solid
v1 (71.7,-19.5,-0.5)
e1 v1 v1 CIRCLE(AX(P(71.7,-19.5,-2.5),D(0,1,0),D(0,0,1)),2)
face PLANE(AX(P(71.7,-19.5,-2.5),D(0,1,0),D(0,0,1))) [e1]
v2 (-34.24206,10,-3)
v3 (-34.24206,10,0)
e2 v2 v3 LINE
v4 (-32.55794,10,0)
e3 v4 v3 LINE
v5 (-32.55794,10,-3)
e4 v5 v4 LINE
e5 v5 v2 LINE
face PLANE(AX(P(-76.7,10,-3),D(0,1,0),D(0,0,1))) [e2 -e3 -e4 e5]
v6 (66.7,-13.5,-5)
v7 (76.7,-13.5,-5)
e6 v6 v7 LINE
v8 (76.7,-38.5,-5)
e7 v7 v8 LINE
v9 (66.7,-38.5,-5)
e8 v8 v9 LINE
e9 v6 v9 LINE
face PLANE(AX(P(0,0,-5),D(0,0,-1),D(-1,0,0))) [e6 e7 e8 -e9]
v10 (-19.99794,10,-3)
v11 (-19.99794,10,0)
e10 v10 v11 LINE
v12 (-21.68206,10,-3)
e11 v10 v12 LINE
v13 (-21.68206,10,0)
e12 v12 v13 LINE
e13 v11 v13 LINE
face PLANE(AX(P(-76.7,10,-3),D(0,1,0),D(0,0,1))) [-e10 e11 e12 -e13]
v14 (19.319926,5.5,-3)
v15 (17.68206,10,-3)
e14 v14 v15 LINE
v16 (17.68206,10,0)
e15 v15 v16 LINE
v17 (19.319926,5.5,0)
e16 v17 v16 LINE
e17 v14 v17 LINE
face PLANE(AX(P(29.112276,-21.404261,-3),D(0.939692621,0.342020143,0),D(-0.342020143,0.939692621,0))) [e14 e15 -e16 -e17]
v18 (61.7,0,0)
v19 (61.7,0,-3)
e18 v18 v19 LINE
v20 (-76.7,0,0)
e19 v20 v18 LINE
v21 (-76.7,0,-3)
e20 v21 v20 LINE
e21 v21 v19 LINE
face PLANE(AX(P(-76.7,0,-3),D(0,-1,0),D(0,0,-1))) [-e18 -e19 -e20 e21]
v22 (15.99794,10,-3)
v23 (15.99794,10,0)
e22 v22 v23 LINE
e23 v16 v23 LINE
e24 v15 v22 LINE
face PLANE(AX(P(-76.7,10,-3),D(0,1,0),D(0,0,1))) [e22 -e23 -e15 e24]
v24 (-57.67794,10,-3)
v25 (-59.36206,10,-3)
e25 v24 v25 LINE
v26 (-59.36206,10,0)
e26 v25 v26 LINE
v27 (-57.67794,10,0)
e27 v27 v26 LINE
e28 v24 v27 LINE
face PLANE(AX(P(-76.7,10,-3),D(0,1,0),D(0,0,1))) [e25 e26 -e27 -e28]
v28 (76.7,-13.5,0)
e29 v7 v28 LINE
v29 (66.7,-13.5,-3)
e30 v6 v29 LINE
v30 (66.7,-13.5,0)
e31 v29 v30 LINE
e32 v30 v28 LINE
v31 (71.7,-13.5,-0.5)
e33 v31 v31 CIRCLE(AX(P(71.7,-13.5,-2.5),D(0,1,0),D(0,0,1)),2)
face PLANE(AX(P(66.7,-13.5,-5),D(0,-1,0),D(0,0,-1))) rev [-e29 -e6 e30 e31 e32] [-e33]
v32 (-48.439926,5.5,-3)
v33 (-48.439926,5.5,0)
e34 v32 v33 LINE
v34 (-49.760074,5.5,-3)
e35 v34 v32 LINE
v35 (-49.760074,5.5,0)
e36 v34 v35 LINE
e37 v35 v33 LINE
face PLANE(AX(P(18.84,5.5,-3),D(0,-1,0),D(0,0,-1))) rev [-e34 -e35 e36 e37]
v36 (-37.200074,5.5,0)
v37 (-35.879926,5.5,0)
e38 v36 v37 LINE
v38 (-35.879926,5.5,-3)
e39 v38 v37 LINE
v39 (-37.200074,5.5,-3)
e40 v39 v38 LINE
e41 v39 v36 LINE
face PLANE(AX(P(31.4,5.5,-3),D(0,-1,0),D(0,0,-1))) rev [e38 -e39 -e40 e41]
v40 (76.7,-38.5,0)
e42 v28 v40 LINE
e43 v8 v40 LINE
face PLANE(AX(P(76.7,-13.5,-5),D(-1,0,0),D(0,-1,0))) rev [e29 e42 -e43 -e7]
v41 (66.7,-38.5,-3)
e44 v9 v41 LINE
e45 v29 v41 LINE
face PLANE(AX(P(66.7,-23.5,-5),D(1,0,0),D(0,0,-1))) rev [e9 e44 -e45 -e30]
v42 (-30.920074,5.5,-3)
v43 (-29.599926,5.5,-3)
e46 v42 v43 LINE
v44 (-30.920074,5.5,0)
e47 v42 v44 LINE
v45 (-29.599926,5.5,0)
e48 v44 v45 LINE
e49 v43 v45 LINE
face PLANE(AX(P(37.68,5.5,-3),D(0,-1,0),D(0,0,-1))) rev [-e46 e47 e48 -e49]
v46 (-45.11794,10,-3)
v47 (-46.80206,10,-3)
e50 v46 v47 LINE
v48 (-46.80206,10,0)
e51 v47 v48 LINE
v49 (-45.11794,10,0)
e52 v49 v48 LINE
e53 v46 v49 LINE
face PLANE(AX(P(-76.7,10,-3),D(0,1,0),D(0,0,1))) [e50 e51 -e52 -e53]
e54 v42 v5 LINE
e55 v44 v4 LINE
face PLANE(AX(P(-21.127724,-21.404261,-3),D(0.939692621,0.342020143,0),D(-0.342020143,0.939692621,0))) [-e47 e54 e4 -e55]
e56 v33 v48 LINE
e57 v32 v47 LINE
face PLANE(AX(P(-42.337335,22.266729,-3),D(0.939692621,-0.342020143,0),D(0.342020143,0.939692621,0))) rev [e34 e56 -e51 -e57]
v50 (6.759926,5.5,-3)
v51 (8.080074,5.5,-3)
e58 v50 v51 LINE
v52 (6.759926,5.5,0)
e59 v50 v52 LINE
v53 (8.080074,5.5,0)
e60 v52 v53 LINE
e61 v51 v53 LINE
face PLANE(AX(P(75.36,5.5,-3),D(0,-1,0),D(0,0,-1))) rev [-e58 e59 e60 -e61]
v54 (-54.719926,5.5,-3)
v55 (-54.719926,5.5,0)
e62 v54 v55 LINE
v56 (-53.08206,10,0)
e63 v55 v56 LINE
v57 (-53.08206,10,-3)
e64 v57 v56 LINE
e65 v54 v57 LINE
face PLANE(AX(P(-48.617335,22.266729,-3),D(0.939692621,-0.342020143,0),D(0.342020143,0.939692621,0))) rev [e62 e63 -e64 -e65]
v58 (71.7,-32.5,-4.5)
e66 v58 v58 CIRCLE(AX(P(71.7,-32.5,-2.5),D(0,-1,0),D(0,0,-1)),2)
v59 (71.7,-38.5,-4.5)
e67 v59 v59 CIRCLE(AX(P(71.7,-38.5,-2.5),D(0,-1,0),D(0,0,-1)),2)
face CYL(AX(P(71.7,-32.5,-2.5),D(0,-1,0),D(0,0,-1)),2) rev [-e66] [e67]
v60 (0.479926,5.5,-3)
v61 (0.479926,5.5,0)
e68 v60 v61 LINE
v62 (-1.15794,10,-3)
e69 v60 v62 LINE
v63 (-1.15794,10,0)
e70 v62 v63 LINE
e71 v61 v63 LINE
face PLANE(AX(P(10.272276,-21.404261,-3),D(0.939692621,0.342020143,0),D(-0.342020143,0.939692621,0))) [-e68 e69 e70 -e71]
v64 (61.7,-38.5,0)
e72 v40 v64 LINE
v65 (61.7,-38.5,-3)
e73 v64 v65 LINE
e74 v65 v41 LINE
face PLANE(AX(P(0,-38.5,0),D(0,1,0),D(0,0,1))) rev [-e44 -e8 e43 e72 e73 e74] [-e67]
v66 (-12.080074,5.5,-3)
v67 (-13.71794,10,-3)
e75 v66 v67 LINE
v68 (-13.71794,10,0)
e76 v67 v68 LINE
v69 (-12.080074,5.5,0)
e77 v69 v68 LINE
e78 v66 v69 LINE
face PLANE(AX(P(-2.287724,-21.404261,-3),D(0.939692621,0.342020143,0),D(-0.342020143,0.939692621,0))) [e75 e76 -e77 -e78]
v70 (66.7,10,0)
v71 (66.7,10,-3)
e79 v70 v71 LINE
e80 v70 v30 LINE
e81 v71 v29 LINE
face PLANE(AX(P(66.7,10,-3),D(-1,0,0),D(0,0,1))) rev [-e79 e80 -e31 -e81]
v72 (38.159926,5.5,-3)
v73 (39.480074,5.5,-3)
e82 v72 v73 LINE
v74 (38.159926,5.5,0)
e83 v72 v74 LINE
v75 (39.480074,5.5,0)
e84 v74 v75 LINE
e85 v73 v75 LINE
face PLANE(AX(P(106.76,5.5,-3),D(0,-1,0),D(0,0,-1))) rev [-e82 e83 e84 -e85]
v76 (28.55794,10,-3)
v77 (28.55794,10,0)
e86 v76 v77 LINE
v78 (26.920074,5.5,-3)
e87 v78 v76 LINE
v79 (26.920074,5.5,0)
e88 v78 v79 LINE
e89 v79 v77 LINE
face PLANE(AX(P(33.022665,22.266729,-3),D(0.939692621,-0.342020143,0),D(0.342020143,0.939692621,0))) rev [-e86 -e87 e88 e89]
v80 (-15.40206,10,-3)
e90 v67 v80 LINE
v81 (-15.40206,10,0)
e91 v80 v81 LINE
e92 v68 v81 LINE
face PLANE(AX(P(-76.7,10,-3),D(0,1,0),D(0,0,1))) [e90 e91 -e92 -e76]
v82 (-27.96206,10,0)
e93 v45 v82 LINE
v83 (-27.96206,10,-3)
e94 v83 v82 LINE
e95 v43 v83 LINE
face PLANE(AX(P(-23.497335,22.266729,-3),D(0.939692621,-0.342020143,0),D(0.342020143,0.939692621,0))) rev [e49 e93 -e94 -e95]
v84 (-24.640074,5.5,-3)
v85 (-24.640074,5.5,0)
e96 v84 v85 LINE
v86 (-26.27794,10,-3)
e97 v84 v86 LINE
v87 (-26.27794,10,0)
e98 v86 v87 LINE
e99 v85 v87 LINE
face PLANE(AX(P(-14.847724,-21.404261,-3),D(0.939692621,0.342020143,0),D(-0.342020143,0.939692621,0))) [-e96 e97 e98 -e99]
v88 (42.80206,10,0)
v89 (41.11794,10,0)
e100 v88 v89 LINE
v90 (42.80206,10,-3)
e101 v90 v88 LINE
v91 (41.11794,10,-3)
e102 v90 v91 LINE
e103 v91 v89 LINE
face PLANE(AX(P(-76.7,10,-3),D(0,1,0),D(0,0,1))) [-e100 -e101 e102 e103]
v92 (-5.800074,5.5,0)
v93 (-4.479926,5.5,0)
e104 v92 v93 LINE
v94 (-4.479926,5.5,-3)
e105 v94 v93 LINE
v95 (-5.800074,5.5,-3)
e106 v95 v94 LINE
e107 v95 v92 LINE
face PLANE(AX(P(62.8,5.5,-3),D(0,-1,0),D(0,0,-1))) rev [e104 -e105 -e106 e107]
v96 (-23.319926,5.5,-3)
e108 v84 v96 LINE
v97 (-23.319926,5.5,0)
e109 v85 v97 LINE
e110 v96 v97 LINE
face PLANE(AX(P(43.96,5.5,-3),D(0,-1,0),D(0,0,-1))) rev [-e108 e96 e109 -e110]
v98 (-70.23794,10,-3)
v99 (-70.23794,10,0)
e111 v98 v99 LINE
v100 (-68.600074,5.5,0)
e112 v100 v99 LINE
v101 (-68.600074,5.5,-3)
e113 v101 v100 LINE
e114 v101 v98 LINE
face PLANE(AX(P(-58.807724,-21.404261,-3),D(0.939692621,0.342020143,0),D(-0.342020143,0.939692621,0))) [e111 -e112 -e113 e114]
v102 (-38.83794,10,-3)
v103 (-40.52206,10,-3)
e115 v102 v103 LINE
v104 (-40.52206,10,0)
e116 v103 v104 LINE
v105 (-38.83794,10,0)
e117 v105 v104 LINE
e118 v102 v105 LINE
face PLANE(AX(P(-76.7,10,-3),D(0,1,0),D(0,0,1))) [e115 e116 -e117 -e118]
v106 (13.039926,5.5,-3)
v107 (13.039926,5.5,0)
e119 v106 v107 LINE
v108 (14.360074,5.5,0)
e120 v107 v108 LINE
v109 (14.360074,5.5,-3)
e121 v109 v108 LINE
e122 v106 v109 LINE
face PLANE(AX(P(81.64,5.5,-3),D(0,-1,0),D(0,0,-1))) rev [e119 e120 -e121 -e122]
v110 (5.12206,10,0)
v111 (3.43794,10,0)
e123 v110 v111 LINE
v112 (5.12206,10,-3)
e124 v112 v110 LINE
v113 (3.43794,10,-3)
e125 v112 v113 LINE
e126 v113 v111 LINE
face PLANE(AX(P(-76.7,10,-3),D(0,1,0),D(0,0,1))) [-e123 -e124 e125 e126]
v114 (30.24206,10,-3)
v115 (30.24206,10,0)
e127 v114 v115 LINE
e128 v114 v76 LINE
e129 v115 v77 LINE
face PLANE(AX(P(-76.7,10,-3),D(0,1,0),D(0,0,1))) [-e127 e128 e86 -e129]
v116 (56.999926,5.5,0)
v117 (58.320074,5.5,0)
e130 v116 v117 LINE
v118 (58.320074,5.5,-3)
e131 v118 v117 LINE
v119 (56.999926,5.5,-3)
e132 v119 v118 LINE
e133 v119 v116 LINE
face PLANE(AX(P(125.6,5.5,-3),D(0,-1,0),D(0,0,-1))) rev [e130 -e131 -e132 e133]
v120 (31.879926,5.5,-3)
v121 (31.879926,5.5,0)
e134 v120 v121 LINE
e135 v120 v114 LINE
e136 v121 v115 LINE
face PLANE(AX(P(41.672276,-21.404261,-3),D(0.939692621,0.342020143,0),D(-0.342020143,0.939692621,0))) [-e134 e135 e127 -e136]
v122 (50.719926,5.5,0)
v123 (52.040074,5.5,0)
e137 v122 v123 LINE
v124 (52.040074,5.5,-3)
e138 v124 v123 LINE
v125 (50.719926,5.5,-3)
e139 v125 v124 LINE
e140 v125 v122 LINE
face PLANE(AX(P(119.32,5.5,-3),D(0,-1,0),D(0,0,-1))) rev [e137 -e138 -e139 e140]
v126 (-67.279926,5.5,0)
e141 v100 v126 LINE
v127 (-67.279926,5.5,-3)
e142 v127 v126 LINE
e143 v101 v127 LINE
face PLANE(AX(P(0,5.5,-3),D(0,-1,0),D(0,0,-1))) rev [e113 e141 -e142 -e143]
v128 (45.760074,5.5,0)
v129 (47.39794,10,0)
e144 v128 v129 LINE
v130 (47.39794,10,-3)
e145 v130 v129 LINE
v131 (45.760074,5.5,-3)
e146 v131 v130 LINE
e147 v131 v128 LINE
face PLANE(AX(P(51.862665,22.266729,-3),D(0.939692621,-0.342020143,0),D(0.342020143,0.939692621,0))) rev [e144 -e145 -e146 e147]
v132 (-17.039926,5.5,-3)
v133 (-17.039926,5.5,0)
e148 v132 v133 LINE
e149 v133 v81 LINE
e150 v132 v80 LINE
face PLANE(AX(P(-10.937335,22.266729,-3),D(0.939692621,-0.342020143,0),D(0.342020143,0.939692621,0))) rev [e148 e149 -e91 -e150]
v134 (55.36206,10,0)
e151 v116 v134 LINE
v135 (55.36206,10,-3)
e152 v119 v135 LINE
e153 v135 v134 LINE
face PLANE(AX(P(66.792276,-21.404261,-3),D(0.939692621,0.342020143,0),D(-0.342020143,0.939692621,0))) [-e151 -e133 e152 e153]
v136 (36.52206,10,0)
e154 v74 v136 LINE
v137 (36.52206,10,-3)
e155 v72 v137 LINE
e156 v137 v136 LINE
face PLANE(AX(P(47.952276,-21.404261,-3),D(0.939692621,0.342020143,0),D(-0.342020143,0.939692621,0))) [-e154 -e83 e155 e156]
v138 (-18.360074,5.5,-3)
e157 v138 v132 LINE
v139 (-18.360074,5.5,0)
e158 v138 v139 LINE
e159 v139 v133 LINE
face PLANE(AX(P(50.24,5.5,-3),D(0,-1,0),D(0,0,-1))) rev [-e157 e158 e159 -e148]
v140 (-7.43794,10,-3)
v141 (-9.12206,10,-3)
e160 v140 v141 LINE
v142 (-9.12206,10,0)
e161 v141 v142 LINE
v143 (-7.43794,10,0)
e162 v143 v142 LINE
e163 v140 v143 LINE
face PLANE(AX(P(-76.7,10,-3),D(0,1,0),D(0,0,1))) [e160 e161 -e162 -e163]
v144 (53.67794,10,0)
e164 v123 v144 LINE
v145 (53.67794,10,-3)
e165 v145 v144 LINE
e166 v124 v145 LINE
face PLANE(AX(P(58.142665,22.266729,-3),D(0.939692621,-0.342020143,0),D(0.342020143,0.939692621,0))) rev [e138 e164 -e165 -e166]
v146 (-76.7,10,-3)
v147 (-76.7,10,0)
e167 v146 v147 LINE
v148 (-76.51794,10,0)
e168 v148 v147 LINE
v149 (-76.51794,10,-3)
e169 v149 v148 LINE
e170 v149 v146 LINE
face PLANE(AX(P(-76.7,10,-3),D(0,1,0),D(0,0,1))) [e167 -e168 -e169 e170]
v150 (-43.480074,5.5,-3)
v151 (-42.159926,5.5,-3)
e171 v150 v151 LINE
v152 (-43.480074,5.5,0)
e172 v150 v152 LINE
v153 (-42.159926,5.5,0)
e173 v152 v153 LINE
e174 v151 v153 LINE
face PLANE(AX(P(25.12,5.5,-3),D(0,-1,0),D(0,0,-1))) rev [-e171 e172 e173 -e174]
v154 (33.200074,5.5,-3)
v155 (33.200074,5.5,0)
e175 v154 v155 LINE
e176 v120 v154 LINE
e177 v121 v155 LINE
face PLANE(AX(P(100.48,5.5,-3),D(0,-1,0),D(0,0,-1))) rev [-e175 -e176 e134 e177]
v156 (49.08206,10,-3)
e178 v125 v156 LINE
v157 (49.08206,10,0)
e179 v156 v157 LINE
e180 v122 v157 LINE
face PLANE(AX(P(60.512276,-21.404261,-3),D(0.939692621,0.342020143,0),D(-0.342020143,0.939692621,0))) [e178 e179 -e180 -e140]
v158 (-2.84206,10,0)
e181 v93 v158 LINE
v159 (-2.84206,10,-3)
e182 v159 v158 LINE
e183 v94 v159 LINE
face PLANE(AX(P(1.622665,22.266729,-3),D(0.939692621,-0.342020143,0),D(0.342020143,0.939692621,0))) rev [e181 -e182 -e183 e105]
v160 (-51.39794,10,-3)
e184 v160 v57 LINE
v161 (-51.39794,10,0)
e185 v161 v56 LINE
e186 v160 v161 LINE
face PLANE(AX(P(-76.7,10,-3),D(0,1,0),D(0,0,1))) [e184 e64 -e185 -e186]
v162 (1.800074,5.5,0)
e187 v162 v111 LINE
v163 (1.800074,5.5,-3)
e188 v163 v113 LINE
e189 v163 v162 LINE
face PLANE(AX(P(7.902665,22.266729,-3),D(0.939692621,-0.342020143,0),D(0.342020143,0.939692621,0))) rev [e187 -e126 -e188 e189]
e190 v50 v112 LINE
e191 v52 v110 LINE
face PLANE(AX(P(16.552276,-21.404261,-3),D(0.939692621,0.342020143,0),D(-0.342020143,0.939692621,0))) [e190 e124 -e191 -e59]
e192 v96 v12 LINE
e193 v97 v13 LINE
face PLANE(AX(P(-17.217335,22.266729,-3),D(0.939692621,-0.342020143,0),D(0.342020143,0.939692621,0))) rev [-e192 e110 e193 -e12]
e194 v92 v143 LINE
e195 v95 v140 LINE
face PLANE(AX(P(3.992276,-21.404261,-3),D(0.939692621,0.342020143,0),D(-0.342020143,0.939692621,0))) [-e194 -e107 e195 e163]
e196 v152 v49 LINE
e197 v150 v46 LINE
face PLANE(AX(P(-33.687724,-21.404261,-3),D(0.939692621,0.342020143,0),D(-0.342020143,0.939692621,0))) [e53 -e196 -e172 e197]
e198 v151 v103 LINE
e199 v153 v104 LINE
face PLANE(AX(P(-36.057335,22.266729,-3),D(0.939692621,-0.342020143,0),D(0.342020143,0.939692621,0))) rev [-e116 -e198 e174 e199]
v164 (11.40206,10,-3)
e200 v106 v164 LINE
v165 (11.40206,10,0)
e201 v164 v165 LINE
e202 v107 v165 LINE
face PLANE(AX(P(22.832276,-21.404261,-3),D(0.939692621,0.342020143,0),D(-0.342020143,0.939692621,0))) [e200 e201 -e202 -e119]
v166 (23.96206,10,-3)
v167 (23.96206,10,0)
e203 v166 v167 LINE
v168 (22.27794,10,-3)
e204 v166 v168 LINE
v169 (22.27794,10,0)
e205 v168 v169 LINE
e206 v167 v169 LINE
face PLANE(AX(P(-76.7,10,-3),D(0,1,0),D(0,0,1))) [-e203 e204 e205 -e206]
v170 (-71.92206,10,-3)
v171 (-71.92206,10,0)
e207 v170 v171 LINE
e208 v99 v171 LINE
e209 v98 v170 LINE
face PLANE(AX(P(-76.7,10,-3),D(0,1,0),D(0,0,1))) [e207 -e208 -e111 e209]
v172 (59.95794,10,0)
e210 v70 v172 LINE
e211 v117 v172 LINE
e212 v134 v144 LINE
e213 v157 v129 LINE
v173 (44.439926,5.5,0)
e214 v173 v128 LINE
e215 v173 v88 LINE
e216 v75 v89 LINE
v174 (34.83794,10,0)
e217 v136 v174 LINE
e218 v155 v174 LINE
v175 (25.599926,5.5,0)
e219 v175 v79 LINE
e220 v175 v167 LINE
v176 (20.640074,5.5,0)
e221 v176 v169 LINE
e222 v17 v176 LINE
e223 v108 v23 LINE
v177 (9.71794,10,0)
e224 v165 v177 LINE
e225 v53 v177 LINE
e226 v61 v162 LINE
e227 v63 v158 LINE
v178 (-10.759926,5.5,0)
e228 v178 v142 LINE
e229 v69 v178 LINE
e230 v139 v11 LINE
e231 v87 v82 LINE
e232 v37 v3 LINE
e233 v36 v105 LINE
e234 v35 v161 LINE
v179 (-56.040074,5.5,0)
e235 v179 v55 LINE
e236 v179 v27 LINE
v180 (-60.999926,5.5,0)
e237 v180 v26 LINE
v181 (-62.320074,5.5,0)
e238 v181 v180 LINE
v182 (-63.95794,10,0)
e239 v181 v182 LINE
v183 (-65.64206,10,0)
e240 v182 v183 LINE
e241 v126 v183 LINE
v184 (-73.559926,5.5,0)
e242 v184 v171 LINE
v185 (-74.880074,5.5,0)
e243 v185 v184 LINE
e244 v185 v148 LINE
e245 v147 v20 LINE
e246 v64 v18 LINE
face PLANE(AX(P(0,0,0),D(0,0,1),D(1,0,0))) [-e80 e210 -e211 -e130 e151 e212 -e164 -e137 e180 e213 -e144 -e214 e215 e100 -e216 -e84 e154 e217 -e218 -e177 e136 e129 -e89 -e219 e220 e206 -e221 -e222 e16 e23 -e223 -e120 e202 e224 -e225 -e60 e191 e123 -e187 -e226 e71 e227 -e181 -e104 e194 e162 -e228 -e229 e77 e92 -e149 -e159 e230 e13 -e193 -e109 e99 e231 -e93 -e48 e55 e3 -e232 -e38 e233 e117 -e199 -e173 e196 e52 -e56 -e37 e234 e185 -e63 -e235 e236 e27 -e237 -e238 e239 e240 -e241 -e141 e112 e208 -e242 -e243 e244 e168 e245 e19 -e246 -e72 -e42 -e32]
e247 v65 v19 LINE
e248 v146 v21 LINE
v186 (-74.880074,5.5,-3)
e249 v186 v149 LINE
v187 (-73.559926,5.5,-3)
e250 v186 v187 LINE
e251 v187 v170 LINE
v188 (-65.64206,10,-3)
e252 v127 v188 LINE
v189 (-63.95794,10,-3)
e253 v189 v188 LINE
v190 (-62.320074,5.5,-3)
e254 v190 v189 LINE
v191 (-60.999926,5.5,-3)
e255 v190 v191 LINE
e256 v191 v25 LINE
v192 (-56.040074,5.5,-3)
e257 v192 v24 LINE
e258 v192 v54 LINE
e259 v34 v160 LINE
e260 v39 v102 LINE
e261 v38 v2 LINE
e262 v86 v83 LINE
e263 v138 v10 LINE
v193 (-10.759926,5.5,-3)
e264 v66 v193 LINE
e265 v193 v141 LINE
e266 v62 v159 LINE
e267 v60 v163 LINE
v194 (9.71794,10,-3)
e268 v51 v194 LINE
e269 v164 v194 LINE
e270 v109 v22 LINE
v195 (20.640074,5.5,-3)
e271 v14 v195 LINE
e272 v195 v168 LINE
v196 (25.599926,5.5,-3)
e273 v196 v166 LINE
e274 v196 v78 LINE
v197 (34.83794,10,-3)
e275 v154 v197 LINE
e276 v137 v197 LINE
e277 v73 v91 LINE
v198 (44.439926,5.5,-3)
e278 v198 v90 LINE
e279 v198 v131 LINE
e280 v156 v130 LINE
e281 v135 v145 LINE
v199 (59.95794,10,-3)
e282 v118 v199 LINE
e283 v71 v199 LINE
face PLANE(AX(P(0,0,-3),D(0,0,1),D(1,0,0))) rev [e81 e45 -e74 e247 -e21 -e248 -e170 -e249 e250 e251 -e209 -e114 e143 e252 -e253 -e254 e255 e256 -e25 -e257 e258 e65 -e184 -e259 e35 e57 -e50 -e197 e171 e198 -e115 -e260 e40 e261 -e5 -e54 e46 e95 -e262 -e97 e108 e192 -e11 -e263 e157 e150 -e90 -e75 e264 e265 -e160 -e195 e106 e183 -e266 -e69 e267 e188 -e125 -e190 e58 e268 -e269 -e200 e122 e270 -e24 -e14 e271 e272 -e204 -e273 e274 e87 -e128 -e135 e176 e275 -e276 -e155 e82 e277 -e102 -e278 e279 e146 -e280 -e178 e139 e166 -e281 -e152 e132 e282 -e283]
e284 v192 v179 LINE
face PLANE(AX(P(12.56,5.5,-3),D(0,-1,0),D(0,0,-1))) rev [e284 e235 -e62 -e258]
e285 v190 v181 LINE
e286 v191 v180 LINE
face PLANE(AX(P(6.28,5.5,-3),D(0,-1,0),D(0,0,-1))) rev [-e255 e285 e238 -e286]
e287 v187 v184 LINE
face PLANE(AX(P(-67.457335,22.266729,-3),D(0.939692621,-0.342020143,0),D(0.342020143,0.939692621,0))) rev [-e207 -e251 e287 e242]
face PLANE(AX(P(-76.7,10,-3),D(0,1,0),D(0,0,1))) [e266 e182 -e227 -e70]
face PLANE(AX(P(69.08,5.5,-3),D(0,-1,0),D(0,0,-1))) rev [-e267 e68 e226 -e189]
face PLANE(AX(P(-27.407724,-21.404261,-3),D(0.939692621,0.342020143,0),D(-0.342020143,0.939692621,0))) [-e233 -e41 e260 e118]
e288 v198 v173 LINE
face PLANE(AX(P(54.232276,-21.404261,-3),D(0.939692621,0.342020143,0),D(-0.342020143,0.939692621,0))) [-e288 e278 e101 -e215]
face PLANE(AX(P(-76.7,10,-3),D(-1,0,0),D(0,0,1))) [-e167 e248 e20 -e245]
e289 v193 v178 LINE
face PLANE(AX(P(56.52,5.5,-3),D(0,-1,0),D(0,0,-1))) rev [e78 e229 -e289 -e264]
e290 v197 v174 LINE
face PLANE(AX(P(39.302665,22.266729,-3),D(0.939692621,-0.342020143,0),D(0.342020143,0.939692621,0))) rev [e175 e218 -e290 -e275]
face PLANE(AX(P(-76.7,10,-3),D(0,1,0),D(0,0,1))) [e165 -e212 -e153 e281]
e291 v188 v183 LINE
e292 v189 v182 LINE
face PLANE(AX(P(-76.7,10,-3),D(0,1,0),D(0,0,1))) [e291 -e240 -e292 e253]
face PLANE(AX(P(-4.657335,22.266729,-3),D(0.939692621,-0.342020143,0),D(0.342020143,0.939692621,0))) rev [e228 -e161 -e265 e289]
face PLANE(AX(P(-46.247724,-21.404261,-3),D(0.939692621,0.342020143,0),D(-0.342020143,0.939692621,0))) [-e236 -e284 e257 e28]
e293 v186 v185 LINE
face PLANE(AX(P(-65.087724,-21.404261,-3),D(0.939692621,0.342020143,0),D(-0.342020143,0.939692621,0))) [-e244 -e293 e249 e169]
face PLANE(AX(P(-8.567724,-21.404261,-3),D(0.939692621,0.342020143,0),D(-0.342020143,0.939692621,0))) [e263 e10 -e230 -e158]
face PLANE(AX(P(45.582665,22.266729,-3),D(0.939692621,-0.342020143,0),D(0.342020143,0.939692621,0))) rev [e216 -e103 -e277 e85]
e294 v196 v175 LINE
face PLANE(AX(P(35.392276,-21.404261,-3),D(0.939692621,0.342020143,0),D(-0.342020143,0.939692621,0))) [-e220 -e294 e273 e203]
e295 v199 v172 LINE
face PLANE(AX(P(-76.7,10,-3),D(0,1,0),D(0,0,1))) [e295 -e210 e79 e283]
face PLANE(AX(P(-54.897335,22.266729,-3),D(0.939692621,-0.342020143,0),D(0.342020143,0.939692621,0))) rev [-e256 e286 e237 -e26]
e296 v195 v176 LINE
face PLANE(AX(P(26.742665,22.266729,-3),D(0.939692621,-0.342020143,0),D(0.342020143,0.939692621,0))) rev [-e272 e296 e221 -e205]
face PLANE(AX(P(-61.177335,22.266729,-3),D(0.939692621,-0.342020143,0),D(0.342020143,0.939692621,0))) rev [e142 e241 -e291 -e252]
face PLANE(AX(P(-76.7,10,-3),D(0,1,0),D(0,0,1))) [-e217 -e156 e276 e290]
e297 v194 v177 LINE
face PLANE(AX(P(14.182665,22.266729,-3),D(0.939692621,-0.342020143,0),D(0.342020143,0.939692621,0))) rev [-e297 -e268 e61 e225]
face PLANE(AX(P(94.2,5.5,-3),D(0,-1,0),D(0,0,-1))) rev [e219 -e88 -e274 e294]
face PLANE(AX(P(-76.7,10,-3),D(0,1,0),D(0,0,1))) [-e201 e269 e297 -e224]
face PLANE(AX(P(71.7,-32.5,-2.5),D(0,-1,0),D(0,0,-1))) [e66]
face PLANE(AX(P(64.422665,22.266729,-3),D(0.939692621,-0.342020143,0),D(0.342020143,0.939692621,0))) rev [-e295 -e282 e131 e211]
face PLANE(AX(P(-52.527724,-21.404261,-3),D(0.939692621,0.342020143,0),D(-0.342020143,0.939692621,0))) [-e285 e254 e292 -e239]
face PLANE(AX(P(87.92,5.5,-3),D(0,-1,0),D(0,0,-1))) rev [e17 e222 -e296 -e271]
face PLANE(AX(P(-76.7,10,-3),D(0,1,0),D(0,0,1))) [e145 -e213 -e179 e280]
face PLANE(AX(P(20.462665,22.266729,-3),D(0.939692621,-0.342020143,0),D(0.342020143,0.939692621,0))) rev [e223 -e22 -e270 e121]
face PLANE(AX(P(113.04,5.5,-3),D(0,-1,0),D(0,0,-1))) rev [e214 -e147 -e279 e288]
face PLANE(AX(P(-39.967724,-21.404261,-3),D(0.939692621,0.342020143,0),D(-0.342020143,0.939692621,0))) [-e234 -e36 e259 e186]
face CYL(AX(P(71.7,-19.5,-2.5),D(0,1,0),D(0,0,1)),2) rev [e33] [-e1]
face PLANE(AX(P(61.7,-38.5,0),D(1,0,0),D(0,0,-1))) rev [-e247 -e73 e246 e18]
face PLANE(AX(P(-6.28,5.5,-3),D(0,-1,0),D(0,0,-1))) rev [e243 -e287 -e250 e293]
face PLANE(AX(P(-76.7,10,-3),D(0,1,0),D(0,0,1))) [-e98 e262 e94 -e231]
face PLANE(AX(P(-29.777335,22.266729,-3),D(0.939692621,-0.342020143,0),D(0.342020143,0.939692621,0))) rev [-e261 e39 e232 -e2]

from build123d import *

# Parameters (mm, degrees)
SKETCH_1_W                 = 153.4
SKETCH_1_H                 = 10
EXTRUDE_1_DEPTH            = 3
CUT_EXTRUDE_1_DEPTH        = 78.407299397
PATTERN_LINEAR_1_COUNT     = 21
PATTERN_LINEAR_1_PITCH     = 6.28
PATTERN_LINEAR_1_COL_COUNT = 2
PATTERN_LINEAR_1_COL_PITCH = 6.28
SKETCH_3_W                 = 10
SKETCH_3_H                 = 3
CUT_EXTRUDE_2_DEPTH        = 78.407299397
SKETCH_4_W                 = 5
SKETCH_4_H                 = 3
EXTRUDE_2_DEPTH            = 38.5
EXTRUDE_START              = -5
EXTRUDE_1_2_OUTLINE_W      = 10
EXTRUDE_1_2_OUTLINE_H      = 25
EXTRUDE_1_2_DEPTH          = 5
SKETCH_6_R                 = 2
CUT_EXTRUDE_3_DEPTH        = 6
CUT_EXTRUDE_START          = -6
SKETCH_7_R                 = 2
CUT_EXTRUDE_4_DEPTH        = 6


# Read off the part's stored shape, not the designer's step: 돌출-얇게1
with BuildPart() as part:
    # 스케치1 → Extrude 1 (new body)
    with BuildSketch(Plane.XY):
        with Locations((0, 5)):
            Rectangle(SKETCH_1_W, SKETCH_1_H)
    extrude(amount=-EXTRUDE_1_DEPTH)

    # 스케치2 → 컷-돌출1 (cut, through all)
    with BuildSketch(Plane.XY):
        Polygon((-67.94, 8), (-67.94, 10), (-70.237940469, 10), (-69.51, 8), align=None)
        Polygon((-65.642059531, 10), (-67.94, 10), (-67.94, 8), (-66.37, 8), align=None)
        Polygon((-66.37, 8), (-67.94, 8), (-67.94, 5.5), (-67.279925586, 5.5), align=None)
        Polygon((-67.94, 5.5), (-67.94, 8), (-69.51, 8), (-68.600074414, 5.5), align=None)
    cut_extrude_1 = extrude(amount=-CUT_EXTRUDE_1_DEPTH, mode=Mode.SUBTRACT)

    # 선형 패턴1: 컷-돌출1 ×21
    with Locations(*[(i * PATTERN_LINEAR_1_PITCH, 0, 0) for i in range(1, PATTERN_LINEAR_1_COUNT)]):
        add(cut_extrude_1, mode=Mode.SUBTRACT)

    # 선형 패턴1 col: 컷-돌출1 ×2
    with Locations(*[(-i * PATTERN_LINEAR_1_COL_PITCH, 0, 0) for i in range(1, PATTERN_LINEAR_1_COL_COUNT)]):
        add(cut_extrude_1, mode=Mode.SUBTRACT)

    # 스케치3 → 컷-돌출2 (cut, through all)
    with BuildSketch(Plane.XZ):
        with Locations((71.7, -1.5)):
            Rectangle(SKETCH_3_W, SKETCH_3_H)
    extrude(amount=-CUT_EXTRUDE_2_DEPTH, mode=Mode.SUBTRACT)

    # 스케치4 → 보스-돌출2 (add)
    with BuildSketch(Plane(origin=(0, 0, 0), x_dir=(-1, 0, 0), z_dir=(0, -1, 0))):
        with Locations((-64.2, 1.5)):
            Rectangle(SKETCH_4_W, SKETCH_4_H)
    extrude(amount=EXTRUDE_2_DEPTH)

    # Extrude 1 2 outline → Extrude 1 2 (add)
    with BuildSketch(Plane.XY.offset(EXTRUDE_START)):
        with Locations((71.7, -26)):
            Rectangle(EXTRUDE_1_2_OUTLINE_W, EXTRUDE_1_2_OUTLINE_H)
    extrude(amount=EXTRUDE_1_2_DEPTH)

    # 스케치6 → 컷-돌출3 (cut)
    with BuildSketch(Plane(origin=(0, -38.5, 0), x_dir=(-1, 0, 0), z_dir=(0, -1, 0))):
        with Locations(Location((-71.7, 2.5, 0), (0, 0, 90))):
            Circle(SKETCH_6_R)
    extrude(amount=-CUT_EXTRUDE_3_DEPTH, mode=Mode.SUBTRACT)

    # 스케치7 → 컷-돌출4 (cut)
    with BuildSketch(Plane(origin=(0, -13.5, 0), x_dir=(1, 0, 0), z_dir=(0, 1, 0)).offset(CUT_EXTRUDE_START)):
        with Locations(Location((71.7, 2.5, 0), (0, 0, 90))):
            Circle(SKETCH_7_R)
    extrude(amount=CUT_EXTRUDE_4_DEPTH, mode=Mode.SUBTRACT)


solid = part.part
